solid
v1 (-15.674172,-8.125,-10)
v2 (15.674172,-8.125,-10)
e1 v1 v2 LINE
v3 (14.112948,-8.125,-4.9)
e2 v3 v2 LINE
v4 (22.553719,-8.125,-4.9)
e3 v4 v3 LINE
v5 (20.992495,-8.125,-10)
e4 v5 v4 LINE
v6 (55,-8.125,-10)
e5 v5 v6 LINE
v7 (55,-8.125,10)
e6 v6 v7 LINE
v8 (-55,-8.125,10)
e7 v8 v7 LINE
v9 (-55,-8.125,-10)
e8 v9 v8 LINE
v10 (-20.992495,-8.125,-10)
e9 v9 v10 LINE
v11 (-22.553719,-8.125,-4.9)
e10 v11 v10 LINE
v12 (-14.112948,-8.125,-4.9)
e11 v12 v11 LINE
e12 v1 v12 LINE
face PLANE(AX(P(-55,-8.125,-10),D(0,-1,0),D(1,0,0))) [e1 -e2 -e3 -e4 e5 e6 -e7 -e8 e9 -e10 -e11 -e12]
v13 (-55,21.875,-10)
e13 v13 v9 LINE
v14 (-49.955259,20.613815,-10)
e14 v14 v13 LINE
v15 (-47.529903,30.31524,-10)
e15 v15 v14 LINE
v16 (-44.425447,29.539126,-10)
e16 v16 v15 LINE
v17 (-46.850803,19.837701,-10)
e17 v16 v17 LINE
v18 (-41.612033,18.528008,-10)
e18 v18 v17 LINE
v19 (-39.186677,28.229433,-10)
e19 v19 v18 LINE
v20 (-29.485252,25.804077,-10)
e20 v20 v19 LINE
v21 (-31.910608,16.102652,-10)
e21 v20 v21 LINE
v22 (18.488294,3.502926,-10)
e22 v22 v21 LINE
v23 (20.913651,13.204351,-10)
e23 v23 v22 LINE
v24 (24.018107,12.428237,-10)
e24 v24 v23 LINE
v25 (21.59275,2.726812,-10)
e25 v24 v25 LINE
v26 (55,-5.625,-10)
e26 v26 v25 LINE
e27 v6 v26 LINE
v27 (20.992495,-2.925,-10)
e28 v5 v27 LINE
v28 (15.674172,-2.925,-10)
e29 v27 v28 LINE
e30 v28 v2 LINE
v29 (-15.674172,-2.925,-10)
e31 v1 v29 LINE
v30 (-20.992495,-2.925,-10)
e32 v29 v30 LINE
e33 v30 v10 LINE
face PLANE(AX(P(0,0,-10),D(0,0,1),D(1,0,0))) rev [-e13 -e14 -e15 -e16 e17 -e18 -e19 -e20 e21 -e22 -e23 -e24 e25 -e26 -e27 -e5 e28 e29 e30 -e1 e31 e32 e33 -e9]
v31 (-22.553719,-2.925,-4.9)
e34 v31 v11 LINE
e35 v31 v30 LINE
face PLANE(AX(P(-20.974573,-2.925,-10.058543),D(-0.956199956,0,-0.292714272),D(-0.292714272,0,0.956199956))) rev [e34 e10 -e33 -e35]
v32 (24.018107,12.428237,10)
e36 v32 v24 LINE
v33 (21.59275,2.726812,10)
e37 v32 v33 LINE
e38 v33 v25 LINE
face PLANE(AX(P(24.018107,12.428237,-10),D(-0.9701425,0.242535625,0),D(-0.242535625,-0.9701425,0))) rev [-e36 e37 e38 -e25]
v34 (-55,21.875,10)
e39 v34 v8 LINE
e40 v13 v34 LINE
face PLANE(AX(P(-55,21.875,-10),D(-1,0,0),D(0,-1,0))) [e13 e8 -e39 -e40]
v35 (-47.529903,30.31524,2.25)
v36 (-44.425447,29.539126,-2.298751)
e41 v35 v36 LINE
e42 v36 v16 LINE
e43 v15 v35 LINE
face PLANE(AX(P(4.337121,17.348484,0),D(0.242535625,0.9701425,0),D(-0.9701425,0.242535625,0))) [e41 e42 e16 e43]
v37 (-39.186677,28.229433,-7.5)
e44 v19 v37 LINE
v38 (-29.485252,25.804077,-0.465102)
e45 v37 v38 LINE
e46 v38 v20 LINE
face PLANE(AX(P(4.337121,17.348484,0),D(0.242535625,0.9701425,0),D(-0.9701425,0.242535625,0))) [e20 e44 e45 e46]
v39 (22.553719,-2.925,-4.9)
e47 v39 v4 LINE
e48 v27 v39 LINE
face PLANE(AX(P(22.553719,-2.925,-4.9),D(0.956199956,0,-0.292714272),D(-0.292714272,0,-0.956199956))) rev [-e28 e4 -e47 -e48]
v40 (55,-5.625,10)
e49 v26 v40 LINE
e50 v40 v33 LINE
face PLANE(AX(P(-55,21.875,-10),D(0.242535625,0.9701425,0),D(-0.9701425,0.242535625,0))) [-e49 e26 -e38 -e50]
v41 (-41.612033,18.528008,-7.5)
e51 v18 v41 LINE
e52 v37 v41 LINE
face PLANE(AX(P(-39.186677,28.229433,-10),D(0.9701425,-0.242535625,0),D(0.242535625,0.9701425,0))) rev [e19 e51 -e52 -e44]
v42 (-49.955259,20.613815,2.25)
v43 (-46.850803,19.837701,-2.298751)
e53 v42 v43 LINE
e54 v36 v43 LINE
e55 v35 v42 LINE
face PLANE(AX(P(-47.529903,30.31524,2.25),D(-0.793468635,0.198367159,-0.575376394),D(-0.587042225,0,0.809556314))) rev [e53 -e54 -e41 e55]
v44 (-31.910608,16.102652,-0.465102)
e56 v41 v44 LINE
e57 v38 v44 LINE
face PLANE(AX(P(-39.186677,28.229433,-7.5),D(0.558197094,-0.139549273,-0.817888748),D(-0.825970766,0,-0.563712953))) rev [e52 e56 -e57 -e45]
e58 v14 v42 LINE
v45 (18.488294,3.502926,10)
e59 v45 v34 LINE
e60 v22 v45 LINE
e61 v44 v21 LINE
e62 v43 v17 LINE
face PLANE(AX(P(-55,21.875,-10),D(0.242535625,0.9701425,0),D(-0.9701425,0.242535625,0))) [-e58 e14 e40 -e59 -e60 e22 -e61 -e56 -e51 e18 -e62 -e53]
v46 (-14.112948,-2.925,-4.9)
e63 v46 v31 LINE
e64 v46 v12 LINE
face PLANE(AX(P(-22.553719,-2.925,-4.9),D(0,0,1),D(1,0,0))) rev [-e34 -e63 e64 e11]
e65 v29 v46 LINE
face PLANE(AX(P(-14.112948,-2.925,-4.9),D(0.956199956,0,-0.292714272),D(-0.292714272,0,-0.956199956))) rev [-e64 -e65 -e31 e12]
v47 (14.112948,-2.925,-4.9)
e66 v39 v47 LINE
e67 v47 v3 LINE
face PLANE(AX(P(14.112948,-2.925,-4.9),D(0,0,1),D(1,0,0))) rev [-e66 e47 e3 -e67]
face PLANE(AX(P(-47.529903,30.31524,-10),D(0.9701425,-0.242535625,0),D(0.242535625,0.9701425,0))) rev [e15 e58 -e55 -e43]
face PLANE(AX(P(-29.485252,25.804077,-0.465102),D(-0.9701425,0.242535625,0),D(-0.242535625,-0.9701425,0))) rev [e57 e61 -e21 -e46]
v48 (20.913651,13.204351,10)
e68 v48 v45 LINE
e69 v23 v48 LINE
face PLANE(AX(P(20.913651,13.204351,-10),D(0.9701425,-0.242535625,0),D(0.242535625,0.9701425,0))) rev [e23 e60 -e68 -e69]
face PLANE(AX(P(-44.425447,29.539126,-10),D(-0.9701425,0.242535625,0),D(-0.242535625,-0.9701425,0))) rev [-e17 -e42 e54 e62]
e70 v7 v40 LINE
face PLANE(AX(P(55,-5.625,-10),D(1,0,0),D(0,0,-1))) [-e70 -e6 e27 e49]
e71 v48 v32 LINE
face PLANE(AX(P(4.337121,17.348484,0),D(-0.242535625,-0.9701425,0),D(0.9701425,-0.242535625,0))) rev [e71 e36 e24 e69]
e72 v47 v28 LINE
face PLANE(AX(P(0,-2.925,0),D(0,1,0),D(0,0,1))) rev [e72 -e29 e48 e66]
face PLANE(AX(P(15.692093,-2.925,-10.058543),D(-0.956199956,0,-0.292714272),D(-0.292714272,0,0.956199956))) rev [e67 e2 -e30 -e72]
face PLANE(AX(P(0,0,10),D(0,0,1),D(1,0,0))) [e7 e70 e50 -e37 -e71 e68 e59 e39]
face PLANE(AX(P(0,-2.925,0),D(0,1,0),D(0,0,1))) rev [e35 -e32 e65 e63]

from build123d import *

# Parameters (mm, degrees)
BOSS_EXTRUDE1_DEPTH      = 10
BOSS_EXTRUDE1_DEPTH_BACK = 10
SKETCH2_W                = 3.2
SKETCH2_H                = 20
BOSS_EXTRUDE2_DEPTH      = 10
CUT_EXTRUDE1_START       = -5.2
CUT_EXTRUDE1_DEPTH       = 5.2


# Read off the part's stored shape, not the designer's step: Cut-Extrude1
with BuildPart() as part:
    # Sketch1 → Boss-Extrude1 (new, two sides: drawn at the far end of the back side and taken through both)
    with BuildSketch(Plane.XY.offset(-BOSS_EXTRUDE1_DEPTH_BACK)):
        Polygon((-55, 21.875), (55, -5.625), (55, -8.125), (-55, -8.125), align=None)
    extrude(amount=BOSS_EXTRUDE1_DEPTH + BOSS_EXTRUDE1_DEPTH_BACK)

    # Sketch2 → Boss-Extrude2 (add)
    with BuildSketch(Plane(origin=(1.911764706, 7.647058824, 0), x_dir=(0.970142500145332, -0.24253562503633289, 0), z_dir=(0.24253562503633289, 0.970142500145332, 0))):
        Polygon((-53.463304306, 10), (-50.263304306, 10), (-50.263304306, 2.29875108), (-53.463304306, -2.25), align=None)
        Polygon((-44.863304306, 10), (-44.863304306, 7.5), (-34.863304306, 0.465101973), (-34.863304306, 10), align=None)
        with Locations((18.686695694, 0)):
            Rectangle(SKETCH2_W, SKETCH2_H)
    extrude(amount=BOSS_EXTRUDE2_DEPTH)

    # Cut-Extrude1 outline → Cut-Extrude1 (cut)
    with BuildSketch(Plane.XZ.offset(8.125).offset(CUT_EXTRUDE1_START)):
        Polygon((-14.11294757, -4.9), (-22.553719096, -4.9), (-20.992494606, -10), (-15.67417206, -10), align=None)
        Polygon((14.11294757, -4.9), (15.67417206, -10), (20.992494606, -10), (22.553719096, -4.9), align=None)
    extrude(amount=CUT_EXTRUDE1_DEPTH, mode=Mode.SUBTRACT)


solid = part.part
